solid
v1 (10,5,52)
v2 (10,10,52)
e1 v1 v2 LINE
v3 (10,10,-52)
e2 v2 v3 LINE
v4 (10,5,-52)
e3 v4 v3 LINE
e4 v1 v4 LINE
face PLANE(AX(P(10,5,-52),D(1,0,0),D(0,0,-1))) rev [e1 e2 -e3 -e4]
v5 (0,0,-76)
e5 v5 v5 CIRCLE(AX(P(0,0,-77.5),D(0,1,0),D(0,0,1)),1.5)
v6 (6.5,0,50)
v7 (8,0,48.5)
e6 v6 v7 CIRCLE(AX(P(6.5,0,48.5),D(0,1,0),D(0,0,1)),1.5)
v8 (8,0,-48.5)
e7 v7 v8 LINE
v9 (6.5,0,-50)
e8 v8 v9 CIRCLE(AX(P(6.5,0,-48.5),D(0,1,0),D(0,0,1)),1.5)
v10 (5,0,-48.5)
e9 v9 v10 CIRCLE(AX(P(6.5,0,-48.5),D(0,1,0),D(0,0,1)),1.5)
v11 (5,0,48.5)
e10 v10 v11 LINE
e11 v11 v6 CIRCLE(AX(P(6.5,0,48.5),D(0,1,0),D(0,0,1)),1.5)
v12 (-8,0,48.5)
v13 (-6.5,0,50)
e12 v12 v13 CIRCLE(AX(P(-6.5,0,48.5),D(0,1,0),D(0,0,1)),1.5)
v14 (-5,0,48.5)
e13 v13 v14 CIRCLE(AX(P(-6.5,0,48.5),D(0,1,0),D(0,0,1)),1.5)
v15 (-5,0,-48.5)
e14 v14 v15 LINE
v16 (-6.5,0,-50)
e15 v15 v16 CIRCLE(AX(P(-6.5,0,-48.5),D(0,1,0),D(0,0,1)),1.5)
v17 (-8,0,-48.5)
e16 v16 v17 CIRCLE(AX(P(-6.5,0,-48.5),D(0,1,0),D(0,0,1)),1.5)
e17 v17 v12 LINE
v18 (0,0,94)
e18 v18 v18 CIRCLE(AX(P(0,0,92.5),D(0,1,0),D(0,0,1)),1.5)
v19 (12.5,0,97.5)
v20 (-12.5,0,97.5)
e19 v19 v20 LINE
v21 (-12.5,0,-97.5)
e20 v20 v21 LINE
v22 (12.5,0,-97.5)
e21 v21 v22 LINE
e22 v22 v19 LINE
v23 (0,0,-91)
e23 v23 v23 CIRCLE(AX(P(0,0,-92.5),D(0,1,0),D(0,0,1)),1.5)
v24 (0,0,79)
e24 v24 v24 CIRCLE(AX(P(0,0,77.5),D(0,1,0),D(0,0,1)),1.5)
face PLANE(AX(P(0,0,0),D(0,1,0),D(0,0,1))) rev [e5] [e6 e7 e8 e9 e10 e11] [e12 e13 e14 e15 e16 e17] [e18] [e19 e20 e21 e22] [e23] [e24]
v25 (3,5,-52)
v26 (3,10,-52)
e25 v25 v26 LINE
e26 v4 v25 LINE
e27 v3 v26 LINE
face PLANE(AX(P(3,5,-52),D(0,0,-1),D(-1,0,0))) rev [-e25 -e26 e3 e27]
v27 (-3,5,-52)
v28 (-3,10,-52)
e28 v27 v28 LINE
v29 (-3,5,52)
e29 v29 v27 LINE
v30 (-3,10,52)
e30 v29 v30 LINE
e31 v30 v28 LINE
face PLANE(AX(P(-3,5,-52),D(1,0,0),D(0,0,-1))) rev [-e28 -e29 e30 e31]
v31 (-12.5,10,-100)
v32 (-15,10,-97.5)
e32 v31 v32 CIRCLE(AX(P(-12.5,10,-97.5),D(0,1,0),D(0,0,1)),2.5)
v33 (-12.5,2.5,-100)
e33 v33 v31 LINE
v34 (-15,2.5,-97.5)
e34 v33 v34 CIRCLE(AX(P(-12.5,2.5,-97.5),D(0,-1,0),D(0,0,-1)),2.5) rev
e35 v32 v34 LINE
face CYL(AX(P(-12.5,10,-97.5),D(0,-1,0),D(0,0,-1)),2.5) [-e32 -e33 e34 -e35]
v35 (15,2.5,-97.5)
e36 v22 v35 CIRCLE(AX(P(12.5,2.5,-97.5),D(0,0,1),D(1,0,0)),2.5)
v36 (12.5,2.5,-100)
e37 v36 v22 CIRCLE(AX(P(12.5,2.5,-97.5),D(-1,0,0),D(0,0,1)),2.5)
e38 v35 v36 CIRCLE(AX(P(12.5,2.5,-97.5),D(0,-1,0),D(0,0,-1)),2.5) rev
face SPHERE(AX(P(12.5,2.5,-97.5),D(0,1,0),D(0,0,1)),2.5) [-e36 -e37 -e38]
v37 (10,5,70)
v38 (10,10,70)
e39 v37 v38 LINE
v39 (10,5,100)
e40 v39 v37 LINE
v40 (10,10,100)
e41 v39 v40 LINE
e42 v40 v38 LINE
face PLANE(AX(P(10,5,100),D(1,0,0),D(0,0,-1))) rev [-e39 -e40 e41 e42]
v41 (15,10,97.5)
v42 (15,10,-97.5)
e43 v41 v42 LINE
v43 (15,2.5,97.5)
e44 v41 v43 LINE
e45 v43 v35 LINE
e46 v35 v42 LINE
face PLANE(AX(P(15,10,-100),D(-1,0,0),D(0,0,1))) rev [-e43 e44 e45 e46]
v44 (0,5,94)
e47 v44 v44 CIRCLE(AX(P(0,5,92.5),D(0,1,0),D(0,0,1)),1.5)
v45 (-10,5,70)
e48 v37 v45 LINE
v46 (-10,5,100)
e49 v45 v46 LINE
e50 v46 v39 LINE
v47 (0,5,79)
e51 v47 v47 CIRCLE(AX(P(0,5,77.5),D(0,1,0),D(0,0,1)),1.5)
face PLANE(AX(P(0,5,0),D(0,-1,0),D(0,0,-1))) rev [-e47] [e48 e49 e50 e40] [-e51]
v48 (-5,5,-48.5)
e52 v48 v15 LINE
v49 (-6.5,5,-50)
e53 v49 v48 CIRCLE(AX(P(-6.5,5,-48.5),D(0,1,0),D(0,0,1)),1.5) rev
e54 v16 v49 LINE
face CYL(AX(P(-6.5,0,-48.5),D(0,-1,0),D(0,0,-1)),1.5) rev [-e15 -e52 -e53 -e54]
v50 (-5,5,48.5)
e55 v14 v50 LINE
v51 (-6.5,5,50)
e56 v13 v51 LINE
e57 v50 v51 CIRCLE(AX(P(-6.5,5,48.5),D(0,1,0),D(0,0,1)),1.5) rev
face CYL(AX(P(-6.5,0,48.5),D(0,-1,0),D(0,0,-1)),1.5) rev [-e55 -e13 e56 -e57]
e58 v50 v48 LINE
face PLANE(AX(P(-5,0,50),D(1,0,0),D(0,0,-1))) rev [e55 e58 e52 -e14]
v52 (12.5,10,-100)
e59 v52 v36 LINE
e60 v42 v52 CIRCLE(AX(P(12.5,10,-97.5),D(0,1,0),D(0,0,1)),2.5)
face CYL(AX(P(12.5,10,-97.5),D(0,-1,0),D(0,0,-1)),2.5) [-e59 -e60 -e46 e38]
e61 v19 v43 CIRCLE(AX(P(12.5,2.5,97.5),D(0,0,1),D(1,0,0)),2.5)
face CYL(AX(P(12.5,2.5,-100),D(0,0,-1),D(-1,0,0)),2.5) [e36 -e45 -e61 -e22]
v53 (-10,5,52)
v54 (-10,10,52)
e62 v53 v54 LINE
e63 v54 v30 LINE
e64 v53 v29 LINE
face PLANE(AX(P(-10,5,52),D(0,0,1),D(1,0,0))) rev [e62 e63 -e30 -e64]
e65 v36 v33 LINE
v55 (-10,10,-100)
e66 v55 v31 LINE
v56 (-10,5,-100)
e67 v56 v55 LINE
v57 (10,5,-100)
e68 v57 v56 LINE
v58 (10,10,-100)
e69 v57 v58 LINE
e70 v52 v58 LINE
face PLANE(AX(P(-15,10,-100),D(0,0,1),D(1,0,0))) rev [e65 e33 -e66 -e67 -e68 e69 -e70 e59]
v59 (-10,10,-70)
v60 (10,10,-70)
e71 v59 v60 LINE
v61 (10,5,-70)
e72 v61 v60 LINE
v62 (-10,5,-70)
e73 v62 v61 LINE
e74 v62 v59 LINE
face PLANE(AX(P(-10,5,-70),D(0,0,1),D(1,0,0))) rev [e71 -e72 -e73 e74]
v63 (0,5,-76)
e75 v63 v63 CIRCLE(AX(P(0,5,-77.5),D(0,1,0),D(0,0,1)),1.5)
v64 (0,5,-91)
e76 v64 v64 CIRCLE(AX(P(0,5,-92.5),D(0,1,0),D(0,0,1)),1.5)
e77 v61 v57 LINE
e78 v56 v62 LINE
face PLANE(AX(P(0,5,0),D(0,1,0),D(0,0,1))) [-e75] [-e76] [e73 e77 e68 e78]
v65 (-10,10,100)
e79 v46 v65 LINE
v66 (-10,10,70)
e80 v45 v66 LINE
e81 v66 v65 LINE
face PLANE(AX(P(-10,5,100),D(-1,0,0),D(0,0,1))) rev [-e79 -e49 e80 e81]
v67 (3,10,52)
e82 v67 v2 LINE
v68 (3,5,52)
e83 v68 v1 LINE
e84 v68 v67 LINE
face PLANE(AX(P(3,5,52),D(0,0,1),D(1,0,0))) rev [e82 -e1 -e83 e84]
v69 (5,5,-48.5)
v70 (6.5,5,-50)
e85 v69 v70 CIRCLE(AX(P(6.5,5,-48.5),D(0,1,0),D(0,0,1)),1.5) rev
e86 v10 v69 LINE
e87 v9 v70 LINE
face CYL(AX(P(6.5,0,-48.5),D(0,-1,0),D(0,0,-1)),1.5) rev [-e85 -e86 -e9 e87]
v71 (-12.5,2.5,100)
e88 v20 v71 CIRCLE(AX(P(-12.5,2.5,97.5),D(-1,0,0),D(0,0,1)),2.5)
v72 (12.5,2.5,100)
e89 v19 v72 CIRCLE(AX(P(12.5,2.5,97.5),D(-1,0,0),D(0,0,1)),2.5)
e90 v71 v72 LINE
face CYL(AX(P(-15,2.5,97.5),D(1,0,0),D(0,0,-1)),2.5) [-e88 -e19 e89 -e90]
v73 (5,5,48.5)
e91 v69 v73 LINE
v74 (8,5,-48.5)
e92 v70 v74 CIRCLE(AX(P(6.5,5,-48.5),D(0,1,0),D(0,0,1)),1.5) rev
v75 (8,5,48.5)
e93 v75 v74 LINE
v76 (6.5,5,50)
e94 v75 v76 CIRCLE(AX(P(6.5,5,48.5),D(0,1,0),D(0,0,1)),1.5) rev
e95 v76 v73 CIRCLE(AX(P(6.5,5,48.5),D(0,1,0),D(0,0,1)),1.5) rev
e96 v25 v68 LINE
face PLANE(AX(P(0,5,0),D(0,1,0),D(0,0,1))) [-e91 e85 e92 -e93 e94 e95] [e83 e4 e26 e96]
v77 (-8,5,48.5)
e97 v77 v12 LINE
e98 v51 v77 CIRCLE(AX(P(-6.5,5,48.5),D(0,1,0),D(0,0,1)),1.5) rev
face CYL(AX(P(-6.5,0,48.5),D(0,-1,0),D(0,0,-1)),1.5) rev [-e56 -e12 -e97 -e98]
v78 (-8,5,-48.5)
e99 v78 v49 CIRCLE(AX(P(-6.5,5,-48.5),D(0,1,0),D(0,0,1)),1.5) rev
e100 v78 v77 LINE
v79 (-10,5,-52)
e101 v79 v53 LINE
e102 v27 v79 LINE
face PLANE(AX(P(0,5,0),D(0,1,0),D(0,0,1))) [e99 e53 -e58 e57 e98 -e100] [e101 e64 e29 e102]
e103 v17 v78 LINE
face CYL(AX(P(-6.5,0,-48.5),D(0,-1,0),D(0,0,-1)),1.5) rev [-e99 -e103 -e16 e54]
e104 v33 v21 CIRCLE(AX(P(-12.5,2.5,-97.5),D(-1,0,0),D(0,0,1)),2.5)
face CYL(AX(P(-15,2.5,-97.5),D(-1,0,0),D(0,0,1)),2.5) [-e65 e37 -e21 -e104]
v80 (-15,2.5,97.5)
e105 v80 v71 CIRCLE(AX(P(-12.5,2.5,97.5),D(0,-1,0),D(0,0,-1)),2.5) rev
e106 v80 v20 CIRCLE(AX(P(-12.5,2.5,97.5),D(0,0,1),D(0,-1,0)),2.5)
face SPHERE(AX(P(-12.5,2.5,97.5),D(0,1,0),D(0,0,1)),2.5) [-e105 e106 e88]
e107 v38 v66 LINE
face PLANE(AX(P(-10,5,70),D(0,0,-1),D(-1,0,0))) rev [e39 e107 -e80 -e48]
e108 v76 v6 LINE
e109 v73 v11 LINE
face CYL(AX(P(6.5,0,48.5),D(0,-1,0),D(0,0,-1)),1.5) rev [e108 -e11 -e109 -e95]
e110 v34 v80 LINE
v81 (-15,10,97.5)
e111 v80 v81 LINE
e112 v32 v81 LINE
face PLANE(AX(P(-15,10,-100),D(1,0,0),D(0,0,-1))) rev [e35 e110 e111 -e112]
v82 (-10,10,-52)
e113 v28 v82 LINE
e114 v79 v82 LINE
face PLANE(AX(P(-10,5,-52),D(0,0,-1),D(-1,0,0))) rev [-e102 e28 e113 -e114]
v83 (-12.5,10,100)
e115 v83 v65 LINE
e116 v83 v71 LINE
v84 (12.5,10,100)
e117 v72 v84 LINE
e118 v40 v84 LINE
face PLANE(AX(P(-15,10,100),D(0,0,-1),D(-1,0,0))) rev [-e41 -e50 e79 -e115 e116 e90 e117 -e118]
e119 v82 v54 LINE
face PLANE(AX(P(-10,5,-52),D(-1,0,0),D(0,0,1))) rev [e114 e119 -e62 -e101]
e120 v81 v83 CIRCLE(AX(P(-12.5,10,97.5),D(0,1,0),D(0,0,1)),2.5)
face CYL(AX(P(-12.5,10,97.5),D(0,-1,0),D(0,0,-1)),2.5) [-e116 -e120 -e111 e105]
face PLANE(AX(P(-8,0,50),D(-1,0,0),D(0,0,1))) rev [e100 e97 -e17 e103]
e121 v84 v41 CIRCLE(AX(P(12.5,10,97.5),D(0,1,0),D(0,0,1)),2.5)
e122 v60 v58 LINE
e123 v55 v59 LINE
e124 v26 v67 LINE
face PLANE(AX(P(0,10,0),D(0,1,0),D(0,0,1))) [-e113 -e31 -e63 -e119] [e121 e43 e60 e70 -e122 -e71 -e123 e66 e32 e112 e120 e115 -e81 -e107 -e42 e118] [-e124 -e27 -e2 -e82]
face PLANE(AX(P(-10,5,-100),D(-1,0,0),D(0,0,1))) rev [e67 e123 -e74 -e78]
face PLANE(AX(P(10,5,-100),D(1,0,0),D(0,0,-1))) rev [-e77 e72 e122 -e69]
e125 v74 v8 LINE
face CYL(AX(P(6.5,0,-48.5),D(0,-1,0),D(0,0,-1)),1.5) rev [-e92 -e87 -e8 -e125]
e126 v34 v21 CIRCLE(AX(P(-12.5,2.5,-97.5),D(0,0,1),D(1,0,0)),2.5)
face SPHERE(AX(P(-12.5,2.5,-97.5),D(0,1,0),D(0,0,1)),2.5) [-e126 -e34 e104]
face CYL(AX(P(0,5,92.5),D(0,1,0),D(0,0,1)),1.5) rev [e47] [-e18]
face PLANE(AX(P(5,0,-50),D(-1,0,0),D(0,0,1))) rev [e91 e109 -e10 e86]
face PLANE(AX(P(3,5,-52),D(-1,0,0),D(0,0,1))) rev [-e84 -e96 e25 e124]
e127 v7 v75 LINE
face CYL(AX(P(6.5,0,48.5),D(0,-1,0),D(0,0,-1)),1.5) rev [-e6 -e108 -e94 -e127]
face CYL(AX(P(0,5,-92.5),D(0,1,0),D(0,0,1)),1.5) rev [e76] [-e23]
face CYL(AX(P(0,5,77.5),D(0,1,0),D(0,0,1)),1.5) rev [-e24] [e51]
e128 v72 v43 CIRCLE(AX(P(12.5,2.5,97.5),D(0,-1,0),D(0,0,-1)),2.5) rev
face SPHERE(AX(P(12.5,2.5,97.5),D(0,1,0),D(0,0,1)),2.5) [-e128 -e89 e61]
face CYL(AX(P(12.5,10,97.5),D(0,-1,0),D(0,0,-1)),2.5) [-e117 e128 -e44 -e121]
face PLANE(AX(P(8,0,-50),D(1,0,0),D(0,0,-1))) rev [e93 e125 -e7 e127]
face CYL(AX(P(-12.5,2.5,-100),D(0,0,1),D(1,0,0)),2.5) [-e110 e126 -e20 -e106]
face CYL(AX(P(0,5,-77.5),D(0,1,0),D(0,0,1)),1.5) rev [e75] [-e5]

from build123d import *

# Parameters (mm, degrees)
SKETCH2_W             = 30
SKETCH2_H             = 200
BOSS_EXTRUDE1_DEPTH   = 10
SKETCH3_W             = 20
SKETCH3_H             = 30
SKETCH3_W_2           = 7
SKETCH3_H_2           = 104
CUT_EXTRUDE1_DEPTH    = 5
FILLET1_R             = 2.5
FILLET2_R             = 2.5
SKETCH4_W             = 3
SKETCH4_H             = 100
CUT_EXTRUDE2_DEPTH    = 10
FILLET3_R             = 1.5
F_3_0MM_DOWEL_HOLE1_D = 3


with BuildPart() as part:
    # Sketch2 → Boss-Extrude1 (new body)
    with BuildSketch(Plane(origin=(0, 0, 0), x_dir=(1, 0, 0), z_dir=(0, 1, 0))):
        Rectangle(SKETCH2_W, SKETCH2_H)
    extrude(amount=BOSS_EXTRUDE1_DEPTH)

    # Sketch3 → Cut-Extrude1 (cut)
    with BuildSketch(Plane(origin=(0, 10, 0), x_dir=(1, 0, 0), z_dir=(0, 1, 0))):
        with Locations((0, 85)):
            Rectangle(SKETCH3_W, SKETCH3_H)
        with Locations((0, -85)):
            Rectangle(SKETCH3_W, SKETCH3_H)
        with Locations((6.5, 0)):
            Rectangle(SKETCH3_W_2, SKETCH3_H_2)
        with Locations((-6.5, 0)):
            Rectangle(SKETCH3_W_2, SKETCH3_H_2)
    extrude(amount=-CUT_EXTRUDE1_DEPTH, mode=Mode.SUBTRACT)

    # Fillet1
    fillet1_edges = [part.edges().sort_by_distance(p)[0] for p in [
        (15, 5, 100),
        (-15, 5, 100),
        (-15, 5, -100),
        (15, 5, -100),
    ]]
    fillet(fillet1_edges, radius=FILLET1_R)

    # Fillet2
    fillet2_edges = [part.edges().sort_by_distance(p)[0] for p in [
        (0, 0, 100),
        (15, 0, 0),
        (-15, 0, 0),
        (0, 0, -100),
        (14.267766953, 0, -99.267766953),
        (-14.267766953, 0, -99.267766953),
        (14.267766953, 0, 99.267766953),
        (-14.267766953, 0, 99.267766953),
    ]]
    fillet(fillet2_edges, radius=FILLET2_R)

    # Sketch4 → Cut-Extrude2 (cut)
    with BuildSketch(Plane(origin=(0, 10, 0), x_dir=(1, 0, 0), z_dir=(0, 1, 0))):
        with Locations((6.5, 0)):
            Rectangle(SKETCH4_W, SKETCH4_H)
        with Locations((-6.5, 0)):
            Rectangle(SKETCH4_W, SKETCH4_H)
    extrude(amount=-CUT_EXTRUDE2_DEPTH, mode=Mode.SUBTRACT)

    # Fillet3
    fillet3_edges = [part.edges().sort_by_distance(p)[0] for p in [
        (5, 2.5, 50),
        (8, 2.5, 50),
        (5, 2.5, -50),
        (8, 2.5, -50),
        (-5, 2.5, 50),
        (-8, 2.5, 50),
        (-8, 2.5, -50),
        (-5, 2.5, -50),
    ]]
    fillet(fillet3_edges, radius=FILLET3_R - 0.0001)  # a hair under: the kernel refuses the full size

    # Ø3.0mm Dowel Hole1 (through all)
    with Locations(Plane(origin=(0, 5, 0), x_dir=(1, 0, 0), z_dir=(0, 1, 0))):
        with Locations((0, 92.5), (0, 77.5), (0, -77.5), (0, -92.5)):
            Hole(F_3_0MM_DOWEL_HOLE1_D / 2)


solid = part.part
